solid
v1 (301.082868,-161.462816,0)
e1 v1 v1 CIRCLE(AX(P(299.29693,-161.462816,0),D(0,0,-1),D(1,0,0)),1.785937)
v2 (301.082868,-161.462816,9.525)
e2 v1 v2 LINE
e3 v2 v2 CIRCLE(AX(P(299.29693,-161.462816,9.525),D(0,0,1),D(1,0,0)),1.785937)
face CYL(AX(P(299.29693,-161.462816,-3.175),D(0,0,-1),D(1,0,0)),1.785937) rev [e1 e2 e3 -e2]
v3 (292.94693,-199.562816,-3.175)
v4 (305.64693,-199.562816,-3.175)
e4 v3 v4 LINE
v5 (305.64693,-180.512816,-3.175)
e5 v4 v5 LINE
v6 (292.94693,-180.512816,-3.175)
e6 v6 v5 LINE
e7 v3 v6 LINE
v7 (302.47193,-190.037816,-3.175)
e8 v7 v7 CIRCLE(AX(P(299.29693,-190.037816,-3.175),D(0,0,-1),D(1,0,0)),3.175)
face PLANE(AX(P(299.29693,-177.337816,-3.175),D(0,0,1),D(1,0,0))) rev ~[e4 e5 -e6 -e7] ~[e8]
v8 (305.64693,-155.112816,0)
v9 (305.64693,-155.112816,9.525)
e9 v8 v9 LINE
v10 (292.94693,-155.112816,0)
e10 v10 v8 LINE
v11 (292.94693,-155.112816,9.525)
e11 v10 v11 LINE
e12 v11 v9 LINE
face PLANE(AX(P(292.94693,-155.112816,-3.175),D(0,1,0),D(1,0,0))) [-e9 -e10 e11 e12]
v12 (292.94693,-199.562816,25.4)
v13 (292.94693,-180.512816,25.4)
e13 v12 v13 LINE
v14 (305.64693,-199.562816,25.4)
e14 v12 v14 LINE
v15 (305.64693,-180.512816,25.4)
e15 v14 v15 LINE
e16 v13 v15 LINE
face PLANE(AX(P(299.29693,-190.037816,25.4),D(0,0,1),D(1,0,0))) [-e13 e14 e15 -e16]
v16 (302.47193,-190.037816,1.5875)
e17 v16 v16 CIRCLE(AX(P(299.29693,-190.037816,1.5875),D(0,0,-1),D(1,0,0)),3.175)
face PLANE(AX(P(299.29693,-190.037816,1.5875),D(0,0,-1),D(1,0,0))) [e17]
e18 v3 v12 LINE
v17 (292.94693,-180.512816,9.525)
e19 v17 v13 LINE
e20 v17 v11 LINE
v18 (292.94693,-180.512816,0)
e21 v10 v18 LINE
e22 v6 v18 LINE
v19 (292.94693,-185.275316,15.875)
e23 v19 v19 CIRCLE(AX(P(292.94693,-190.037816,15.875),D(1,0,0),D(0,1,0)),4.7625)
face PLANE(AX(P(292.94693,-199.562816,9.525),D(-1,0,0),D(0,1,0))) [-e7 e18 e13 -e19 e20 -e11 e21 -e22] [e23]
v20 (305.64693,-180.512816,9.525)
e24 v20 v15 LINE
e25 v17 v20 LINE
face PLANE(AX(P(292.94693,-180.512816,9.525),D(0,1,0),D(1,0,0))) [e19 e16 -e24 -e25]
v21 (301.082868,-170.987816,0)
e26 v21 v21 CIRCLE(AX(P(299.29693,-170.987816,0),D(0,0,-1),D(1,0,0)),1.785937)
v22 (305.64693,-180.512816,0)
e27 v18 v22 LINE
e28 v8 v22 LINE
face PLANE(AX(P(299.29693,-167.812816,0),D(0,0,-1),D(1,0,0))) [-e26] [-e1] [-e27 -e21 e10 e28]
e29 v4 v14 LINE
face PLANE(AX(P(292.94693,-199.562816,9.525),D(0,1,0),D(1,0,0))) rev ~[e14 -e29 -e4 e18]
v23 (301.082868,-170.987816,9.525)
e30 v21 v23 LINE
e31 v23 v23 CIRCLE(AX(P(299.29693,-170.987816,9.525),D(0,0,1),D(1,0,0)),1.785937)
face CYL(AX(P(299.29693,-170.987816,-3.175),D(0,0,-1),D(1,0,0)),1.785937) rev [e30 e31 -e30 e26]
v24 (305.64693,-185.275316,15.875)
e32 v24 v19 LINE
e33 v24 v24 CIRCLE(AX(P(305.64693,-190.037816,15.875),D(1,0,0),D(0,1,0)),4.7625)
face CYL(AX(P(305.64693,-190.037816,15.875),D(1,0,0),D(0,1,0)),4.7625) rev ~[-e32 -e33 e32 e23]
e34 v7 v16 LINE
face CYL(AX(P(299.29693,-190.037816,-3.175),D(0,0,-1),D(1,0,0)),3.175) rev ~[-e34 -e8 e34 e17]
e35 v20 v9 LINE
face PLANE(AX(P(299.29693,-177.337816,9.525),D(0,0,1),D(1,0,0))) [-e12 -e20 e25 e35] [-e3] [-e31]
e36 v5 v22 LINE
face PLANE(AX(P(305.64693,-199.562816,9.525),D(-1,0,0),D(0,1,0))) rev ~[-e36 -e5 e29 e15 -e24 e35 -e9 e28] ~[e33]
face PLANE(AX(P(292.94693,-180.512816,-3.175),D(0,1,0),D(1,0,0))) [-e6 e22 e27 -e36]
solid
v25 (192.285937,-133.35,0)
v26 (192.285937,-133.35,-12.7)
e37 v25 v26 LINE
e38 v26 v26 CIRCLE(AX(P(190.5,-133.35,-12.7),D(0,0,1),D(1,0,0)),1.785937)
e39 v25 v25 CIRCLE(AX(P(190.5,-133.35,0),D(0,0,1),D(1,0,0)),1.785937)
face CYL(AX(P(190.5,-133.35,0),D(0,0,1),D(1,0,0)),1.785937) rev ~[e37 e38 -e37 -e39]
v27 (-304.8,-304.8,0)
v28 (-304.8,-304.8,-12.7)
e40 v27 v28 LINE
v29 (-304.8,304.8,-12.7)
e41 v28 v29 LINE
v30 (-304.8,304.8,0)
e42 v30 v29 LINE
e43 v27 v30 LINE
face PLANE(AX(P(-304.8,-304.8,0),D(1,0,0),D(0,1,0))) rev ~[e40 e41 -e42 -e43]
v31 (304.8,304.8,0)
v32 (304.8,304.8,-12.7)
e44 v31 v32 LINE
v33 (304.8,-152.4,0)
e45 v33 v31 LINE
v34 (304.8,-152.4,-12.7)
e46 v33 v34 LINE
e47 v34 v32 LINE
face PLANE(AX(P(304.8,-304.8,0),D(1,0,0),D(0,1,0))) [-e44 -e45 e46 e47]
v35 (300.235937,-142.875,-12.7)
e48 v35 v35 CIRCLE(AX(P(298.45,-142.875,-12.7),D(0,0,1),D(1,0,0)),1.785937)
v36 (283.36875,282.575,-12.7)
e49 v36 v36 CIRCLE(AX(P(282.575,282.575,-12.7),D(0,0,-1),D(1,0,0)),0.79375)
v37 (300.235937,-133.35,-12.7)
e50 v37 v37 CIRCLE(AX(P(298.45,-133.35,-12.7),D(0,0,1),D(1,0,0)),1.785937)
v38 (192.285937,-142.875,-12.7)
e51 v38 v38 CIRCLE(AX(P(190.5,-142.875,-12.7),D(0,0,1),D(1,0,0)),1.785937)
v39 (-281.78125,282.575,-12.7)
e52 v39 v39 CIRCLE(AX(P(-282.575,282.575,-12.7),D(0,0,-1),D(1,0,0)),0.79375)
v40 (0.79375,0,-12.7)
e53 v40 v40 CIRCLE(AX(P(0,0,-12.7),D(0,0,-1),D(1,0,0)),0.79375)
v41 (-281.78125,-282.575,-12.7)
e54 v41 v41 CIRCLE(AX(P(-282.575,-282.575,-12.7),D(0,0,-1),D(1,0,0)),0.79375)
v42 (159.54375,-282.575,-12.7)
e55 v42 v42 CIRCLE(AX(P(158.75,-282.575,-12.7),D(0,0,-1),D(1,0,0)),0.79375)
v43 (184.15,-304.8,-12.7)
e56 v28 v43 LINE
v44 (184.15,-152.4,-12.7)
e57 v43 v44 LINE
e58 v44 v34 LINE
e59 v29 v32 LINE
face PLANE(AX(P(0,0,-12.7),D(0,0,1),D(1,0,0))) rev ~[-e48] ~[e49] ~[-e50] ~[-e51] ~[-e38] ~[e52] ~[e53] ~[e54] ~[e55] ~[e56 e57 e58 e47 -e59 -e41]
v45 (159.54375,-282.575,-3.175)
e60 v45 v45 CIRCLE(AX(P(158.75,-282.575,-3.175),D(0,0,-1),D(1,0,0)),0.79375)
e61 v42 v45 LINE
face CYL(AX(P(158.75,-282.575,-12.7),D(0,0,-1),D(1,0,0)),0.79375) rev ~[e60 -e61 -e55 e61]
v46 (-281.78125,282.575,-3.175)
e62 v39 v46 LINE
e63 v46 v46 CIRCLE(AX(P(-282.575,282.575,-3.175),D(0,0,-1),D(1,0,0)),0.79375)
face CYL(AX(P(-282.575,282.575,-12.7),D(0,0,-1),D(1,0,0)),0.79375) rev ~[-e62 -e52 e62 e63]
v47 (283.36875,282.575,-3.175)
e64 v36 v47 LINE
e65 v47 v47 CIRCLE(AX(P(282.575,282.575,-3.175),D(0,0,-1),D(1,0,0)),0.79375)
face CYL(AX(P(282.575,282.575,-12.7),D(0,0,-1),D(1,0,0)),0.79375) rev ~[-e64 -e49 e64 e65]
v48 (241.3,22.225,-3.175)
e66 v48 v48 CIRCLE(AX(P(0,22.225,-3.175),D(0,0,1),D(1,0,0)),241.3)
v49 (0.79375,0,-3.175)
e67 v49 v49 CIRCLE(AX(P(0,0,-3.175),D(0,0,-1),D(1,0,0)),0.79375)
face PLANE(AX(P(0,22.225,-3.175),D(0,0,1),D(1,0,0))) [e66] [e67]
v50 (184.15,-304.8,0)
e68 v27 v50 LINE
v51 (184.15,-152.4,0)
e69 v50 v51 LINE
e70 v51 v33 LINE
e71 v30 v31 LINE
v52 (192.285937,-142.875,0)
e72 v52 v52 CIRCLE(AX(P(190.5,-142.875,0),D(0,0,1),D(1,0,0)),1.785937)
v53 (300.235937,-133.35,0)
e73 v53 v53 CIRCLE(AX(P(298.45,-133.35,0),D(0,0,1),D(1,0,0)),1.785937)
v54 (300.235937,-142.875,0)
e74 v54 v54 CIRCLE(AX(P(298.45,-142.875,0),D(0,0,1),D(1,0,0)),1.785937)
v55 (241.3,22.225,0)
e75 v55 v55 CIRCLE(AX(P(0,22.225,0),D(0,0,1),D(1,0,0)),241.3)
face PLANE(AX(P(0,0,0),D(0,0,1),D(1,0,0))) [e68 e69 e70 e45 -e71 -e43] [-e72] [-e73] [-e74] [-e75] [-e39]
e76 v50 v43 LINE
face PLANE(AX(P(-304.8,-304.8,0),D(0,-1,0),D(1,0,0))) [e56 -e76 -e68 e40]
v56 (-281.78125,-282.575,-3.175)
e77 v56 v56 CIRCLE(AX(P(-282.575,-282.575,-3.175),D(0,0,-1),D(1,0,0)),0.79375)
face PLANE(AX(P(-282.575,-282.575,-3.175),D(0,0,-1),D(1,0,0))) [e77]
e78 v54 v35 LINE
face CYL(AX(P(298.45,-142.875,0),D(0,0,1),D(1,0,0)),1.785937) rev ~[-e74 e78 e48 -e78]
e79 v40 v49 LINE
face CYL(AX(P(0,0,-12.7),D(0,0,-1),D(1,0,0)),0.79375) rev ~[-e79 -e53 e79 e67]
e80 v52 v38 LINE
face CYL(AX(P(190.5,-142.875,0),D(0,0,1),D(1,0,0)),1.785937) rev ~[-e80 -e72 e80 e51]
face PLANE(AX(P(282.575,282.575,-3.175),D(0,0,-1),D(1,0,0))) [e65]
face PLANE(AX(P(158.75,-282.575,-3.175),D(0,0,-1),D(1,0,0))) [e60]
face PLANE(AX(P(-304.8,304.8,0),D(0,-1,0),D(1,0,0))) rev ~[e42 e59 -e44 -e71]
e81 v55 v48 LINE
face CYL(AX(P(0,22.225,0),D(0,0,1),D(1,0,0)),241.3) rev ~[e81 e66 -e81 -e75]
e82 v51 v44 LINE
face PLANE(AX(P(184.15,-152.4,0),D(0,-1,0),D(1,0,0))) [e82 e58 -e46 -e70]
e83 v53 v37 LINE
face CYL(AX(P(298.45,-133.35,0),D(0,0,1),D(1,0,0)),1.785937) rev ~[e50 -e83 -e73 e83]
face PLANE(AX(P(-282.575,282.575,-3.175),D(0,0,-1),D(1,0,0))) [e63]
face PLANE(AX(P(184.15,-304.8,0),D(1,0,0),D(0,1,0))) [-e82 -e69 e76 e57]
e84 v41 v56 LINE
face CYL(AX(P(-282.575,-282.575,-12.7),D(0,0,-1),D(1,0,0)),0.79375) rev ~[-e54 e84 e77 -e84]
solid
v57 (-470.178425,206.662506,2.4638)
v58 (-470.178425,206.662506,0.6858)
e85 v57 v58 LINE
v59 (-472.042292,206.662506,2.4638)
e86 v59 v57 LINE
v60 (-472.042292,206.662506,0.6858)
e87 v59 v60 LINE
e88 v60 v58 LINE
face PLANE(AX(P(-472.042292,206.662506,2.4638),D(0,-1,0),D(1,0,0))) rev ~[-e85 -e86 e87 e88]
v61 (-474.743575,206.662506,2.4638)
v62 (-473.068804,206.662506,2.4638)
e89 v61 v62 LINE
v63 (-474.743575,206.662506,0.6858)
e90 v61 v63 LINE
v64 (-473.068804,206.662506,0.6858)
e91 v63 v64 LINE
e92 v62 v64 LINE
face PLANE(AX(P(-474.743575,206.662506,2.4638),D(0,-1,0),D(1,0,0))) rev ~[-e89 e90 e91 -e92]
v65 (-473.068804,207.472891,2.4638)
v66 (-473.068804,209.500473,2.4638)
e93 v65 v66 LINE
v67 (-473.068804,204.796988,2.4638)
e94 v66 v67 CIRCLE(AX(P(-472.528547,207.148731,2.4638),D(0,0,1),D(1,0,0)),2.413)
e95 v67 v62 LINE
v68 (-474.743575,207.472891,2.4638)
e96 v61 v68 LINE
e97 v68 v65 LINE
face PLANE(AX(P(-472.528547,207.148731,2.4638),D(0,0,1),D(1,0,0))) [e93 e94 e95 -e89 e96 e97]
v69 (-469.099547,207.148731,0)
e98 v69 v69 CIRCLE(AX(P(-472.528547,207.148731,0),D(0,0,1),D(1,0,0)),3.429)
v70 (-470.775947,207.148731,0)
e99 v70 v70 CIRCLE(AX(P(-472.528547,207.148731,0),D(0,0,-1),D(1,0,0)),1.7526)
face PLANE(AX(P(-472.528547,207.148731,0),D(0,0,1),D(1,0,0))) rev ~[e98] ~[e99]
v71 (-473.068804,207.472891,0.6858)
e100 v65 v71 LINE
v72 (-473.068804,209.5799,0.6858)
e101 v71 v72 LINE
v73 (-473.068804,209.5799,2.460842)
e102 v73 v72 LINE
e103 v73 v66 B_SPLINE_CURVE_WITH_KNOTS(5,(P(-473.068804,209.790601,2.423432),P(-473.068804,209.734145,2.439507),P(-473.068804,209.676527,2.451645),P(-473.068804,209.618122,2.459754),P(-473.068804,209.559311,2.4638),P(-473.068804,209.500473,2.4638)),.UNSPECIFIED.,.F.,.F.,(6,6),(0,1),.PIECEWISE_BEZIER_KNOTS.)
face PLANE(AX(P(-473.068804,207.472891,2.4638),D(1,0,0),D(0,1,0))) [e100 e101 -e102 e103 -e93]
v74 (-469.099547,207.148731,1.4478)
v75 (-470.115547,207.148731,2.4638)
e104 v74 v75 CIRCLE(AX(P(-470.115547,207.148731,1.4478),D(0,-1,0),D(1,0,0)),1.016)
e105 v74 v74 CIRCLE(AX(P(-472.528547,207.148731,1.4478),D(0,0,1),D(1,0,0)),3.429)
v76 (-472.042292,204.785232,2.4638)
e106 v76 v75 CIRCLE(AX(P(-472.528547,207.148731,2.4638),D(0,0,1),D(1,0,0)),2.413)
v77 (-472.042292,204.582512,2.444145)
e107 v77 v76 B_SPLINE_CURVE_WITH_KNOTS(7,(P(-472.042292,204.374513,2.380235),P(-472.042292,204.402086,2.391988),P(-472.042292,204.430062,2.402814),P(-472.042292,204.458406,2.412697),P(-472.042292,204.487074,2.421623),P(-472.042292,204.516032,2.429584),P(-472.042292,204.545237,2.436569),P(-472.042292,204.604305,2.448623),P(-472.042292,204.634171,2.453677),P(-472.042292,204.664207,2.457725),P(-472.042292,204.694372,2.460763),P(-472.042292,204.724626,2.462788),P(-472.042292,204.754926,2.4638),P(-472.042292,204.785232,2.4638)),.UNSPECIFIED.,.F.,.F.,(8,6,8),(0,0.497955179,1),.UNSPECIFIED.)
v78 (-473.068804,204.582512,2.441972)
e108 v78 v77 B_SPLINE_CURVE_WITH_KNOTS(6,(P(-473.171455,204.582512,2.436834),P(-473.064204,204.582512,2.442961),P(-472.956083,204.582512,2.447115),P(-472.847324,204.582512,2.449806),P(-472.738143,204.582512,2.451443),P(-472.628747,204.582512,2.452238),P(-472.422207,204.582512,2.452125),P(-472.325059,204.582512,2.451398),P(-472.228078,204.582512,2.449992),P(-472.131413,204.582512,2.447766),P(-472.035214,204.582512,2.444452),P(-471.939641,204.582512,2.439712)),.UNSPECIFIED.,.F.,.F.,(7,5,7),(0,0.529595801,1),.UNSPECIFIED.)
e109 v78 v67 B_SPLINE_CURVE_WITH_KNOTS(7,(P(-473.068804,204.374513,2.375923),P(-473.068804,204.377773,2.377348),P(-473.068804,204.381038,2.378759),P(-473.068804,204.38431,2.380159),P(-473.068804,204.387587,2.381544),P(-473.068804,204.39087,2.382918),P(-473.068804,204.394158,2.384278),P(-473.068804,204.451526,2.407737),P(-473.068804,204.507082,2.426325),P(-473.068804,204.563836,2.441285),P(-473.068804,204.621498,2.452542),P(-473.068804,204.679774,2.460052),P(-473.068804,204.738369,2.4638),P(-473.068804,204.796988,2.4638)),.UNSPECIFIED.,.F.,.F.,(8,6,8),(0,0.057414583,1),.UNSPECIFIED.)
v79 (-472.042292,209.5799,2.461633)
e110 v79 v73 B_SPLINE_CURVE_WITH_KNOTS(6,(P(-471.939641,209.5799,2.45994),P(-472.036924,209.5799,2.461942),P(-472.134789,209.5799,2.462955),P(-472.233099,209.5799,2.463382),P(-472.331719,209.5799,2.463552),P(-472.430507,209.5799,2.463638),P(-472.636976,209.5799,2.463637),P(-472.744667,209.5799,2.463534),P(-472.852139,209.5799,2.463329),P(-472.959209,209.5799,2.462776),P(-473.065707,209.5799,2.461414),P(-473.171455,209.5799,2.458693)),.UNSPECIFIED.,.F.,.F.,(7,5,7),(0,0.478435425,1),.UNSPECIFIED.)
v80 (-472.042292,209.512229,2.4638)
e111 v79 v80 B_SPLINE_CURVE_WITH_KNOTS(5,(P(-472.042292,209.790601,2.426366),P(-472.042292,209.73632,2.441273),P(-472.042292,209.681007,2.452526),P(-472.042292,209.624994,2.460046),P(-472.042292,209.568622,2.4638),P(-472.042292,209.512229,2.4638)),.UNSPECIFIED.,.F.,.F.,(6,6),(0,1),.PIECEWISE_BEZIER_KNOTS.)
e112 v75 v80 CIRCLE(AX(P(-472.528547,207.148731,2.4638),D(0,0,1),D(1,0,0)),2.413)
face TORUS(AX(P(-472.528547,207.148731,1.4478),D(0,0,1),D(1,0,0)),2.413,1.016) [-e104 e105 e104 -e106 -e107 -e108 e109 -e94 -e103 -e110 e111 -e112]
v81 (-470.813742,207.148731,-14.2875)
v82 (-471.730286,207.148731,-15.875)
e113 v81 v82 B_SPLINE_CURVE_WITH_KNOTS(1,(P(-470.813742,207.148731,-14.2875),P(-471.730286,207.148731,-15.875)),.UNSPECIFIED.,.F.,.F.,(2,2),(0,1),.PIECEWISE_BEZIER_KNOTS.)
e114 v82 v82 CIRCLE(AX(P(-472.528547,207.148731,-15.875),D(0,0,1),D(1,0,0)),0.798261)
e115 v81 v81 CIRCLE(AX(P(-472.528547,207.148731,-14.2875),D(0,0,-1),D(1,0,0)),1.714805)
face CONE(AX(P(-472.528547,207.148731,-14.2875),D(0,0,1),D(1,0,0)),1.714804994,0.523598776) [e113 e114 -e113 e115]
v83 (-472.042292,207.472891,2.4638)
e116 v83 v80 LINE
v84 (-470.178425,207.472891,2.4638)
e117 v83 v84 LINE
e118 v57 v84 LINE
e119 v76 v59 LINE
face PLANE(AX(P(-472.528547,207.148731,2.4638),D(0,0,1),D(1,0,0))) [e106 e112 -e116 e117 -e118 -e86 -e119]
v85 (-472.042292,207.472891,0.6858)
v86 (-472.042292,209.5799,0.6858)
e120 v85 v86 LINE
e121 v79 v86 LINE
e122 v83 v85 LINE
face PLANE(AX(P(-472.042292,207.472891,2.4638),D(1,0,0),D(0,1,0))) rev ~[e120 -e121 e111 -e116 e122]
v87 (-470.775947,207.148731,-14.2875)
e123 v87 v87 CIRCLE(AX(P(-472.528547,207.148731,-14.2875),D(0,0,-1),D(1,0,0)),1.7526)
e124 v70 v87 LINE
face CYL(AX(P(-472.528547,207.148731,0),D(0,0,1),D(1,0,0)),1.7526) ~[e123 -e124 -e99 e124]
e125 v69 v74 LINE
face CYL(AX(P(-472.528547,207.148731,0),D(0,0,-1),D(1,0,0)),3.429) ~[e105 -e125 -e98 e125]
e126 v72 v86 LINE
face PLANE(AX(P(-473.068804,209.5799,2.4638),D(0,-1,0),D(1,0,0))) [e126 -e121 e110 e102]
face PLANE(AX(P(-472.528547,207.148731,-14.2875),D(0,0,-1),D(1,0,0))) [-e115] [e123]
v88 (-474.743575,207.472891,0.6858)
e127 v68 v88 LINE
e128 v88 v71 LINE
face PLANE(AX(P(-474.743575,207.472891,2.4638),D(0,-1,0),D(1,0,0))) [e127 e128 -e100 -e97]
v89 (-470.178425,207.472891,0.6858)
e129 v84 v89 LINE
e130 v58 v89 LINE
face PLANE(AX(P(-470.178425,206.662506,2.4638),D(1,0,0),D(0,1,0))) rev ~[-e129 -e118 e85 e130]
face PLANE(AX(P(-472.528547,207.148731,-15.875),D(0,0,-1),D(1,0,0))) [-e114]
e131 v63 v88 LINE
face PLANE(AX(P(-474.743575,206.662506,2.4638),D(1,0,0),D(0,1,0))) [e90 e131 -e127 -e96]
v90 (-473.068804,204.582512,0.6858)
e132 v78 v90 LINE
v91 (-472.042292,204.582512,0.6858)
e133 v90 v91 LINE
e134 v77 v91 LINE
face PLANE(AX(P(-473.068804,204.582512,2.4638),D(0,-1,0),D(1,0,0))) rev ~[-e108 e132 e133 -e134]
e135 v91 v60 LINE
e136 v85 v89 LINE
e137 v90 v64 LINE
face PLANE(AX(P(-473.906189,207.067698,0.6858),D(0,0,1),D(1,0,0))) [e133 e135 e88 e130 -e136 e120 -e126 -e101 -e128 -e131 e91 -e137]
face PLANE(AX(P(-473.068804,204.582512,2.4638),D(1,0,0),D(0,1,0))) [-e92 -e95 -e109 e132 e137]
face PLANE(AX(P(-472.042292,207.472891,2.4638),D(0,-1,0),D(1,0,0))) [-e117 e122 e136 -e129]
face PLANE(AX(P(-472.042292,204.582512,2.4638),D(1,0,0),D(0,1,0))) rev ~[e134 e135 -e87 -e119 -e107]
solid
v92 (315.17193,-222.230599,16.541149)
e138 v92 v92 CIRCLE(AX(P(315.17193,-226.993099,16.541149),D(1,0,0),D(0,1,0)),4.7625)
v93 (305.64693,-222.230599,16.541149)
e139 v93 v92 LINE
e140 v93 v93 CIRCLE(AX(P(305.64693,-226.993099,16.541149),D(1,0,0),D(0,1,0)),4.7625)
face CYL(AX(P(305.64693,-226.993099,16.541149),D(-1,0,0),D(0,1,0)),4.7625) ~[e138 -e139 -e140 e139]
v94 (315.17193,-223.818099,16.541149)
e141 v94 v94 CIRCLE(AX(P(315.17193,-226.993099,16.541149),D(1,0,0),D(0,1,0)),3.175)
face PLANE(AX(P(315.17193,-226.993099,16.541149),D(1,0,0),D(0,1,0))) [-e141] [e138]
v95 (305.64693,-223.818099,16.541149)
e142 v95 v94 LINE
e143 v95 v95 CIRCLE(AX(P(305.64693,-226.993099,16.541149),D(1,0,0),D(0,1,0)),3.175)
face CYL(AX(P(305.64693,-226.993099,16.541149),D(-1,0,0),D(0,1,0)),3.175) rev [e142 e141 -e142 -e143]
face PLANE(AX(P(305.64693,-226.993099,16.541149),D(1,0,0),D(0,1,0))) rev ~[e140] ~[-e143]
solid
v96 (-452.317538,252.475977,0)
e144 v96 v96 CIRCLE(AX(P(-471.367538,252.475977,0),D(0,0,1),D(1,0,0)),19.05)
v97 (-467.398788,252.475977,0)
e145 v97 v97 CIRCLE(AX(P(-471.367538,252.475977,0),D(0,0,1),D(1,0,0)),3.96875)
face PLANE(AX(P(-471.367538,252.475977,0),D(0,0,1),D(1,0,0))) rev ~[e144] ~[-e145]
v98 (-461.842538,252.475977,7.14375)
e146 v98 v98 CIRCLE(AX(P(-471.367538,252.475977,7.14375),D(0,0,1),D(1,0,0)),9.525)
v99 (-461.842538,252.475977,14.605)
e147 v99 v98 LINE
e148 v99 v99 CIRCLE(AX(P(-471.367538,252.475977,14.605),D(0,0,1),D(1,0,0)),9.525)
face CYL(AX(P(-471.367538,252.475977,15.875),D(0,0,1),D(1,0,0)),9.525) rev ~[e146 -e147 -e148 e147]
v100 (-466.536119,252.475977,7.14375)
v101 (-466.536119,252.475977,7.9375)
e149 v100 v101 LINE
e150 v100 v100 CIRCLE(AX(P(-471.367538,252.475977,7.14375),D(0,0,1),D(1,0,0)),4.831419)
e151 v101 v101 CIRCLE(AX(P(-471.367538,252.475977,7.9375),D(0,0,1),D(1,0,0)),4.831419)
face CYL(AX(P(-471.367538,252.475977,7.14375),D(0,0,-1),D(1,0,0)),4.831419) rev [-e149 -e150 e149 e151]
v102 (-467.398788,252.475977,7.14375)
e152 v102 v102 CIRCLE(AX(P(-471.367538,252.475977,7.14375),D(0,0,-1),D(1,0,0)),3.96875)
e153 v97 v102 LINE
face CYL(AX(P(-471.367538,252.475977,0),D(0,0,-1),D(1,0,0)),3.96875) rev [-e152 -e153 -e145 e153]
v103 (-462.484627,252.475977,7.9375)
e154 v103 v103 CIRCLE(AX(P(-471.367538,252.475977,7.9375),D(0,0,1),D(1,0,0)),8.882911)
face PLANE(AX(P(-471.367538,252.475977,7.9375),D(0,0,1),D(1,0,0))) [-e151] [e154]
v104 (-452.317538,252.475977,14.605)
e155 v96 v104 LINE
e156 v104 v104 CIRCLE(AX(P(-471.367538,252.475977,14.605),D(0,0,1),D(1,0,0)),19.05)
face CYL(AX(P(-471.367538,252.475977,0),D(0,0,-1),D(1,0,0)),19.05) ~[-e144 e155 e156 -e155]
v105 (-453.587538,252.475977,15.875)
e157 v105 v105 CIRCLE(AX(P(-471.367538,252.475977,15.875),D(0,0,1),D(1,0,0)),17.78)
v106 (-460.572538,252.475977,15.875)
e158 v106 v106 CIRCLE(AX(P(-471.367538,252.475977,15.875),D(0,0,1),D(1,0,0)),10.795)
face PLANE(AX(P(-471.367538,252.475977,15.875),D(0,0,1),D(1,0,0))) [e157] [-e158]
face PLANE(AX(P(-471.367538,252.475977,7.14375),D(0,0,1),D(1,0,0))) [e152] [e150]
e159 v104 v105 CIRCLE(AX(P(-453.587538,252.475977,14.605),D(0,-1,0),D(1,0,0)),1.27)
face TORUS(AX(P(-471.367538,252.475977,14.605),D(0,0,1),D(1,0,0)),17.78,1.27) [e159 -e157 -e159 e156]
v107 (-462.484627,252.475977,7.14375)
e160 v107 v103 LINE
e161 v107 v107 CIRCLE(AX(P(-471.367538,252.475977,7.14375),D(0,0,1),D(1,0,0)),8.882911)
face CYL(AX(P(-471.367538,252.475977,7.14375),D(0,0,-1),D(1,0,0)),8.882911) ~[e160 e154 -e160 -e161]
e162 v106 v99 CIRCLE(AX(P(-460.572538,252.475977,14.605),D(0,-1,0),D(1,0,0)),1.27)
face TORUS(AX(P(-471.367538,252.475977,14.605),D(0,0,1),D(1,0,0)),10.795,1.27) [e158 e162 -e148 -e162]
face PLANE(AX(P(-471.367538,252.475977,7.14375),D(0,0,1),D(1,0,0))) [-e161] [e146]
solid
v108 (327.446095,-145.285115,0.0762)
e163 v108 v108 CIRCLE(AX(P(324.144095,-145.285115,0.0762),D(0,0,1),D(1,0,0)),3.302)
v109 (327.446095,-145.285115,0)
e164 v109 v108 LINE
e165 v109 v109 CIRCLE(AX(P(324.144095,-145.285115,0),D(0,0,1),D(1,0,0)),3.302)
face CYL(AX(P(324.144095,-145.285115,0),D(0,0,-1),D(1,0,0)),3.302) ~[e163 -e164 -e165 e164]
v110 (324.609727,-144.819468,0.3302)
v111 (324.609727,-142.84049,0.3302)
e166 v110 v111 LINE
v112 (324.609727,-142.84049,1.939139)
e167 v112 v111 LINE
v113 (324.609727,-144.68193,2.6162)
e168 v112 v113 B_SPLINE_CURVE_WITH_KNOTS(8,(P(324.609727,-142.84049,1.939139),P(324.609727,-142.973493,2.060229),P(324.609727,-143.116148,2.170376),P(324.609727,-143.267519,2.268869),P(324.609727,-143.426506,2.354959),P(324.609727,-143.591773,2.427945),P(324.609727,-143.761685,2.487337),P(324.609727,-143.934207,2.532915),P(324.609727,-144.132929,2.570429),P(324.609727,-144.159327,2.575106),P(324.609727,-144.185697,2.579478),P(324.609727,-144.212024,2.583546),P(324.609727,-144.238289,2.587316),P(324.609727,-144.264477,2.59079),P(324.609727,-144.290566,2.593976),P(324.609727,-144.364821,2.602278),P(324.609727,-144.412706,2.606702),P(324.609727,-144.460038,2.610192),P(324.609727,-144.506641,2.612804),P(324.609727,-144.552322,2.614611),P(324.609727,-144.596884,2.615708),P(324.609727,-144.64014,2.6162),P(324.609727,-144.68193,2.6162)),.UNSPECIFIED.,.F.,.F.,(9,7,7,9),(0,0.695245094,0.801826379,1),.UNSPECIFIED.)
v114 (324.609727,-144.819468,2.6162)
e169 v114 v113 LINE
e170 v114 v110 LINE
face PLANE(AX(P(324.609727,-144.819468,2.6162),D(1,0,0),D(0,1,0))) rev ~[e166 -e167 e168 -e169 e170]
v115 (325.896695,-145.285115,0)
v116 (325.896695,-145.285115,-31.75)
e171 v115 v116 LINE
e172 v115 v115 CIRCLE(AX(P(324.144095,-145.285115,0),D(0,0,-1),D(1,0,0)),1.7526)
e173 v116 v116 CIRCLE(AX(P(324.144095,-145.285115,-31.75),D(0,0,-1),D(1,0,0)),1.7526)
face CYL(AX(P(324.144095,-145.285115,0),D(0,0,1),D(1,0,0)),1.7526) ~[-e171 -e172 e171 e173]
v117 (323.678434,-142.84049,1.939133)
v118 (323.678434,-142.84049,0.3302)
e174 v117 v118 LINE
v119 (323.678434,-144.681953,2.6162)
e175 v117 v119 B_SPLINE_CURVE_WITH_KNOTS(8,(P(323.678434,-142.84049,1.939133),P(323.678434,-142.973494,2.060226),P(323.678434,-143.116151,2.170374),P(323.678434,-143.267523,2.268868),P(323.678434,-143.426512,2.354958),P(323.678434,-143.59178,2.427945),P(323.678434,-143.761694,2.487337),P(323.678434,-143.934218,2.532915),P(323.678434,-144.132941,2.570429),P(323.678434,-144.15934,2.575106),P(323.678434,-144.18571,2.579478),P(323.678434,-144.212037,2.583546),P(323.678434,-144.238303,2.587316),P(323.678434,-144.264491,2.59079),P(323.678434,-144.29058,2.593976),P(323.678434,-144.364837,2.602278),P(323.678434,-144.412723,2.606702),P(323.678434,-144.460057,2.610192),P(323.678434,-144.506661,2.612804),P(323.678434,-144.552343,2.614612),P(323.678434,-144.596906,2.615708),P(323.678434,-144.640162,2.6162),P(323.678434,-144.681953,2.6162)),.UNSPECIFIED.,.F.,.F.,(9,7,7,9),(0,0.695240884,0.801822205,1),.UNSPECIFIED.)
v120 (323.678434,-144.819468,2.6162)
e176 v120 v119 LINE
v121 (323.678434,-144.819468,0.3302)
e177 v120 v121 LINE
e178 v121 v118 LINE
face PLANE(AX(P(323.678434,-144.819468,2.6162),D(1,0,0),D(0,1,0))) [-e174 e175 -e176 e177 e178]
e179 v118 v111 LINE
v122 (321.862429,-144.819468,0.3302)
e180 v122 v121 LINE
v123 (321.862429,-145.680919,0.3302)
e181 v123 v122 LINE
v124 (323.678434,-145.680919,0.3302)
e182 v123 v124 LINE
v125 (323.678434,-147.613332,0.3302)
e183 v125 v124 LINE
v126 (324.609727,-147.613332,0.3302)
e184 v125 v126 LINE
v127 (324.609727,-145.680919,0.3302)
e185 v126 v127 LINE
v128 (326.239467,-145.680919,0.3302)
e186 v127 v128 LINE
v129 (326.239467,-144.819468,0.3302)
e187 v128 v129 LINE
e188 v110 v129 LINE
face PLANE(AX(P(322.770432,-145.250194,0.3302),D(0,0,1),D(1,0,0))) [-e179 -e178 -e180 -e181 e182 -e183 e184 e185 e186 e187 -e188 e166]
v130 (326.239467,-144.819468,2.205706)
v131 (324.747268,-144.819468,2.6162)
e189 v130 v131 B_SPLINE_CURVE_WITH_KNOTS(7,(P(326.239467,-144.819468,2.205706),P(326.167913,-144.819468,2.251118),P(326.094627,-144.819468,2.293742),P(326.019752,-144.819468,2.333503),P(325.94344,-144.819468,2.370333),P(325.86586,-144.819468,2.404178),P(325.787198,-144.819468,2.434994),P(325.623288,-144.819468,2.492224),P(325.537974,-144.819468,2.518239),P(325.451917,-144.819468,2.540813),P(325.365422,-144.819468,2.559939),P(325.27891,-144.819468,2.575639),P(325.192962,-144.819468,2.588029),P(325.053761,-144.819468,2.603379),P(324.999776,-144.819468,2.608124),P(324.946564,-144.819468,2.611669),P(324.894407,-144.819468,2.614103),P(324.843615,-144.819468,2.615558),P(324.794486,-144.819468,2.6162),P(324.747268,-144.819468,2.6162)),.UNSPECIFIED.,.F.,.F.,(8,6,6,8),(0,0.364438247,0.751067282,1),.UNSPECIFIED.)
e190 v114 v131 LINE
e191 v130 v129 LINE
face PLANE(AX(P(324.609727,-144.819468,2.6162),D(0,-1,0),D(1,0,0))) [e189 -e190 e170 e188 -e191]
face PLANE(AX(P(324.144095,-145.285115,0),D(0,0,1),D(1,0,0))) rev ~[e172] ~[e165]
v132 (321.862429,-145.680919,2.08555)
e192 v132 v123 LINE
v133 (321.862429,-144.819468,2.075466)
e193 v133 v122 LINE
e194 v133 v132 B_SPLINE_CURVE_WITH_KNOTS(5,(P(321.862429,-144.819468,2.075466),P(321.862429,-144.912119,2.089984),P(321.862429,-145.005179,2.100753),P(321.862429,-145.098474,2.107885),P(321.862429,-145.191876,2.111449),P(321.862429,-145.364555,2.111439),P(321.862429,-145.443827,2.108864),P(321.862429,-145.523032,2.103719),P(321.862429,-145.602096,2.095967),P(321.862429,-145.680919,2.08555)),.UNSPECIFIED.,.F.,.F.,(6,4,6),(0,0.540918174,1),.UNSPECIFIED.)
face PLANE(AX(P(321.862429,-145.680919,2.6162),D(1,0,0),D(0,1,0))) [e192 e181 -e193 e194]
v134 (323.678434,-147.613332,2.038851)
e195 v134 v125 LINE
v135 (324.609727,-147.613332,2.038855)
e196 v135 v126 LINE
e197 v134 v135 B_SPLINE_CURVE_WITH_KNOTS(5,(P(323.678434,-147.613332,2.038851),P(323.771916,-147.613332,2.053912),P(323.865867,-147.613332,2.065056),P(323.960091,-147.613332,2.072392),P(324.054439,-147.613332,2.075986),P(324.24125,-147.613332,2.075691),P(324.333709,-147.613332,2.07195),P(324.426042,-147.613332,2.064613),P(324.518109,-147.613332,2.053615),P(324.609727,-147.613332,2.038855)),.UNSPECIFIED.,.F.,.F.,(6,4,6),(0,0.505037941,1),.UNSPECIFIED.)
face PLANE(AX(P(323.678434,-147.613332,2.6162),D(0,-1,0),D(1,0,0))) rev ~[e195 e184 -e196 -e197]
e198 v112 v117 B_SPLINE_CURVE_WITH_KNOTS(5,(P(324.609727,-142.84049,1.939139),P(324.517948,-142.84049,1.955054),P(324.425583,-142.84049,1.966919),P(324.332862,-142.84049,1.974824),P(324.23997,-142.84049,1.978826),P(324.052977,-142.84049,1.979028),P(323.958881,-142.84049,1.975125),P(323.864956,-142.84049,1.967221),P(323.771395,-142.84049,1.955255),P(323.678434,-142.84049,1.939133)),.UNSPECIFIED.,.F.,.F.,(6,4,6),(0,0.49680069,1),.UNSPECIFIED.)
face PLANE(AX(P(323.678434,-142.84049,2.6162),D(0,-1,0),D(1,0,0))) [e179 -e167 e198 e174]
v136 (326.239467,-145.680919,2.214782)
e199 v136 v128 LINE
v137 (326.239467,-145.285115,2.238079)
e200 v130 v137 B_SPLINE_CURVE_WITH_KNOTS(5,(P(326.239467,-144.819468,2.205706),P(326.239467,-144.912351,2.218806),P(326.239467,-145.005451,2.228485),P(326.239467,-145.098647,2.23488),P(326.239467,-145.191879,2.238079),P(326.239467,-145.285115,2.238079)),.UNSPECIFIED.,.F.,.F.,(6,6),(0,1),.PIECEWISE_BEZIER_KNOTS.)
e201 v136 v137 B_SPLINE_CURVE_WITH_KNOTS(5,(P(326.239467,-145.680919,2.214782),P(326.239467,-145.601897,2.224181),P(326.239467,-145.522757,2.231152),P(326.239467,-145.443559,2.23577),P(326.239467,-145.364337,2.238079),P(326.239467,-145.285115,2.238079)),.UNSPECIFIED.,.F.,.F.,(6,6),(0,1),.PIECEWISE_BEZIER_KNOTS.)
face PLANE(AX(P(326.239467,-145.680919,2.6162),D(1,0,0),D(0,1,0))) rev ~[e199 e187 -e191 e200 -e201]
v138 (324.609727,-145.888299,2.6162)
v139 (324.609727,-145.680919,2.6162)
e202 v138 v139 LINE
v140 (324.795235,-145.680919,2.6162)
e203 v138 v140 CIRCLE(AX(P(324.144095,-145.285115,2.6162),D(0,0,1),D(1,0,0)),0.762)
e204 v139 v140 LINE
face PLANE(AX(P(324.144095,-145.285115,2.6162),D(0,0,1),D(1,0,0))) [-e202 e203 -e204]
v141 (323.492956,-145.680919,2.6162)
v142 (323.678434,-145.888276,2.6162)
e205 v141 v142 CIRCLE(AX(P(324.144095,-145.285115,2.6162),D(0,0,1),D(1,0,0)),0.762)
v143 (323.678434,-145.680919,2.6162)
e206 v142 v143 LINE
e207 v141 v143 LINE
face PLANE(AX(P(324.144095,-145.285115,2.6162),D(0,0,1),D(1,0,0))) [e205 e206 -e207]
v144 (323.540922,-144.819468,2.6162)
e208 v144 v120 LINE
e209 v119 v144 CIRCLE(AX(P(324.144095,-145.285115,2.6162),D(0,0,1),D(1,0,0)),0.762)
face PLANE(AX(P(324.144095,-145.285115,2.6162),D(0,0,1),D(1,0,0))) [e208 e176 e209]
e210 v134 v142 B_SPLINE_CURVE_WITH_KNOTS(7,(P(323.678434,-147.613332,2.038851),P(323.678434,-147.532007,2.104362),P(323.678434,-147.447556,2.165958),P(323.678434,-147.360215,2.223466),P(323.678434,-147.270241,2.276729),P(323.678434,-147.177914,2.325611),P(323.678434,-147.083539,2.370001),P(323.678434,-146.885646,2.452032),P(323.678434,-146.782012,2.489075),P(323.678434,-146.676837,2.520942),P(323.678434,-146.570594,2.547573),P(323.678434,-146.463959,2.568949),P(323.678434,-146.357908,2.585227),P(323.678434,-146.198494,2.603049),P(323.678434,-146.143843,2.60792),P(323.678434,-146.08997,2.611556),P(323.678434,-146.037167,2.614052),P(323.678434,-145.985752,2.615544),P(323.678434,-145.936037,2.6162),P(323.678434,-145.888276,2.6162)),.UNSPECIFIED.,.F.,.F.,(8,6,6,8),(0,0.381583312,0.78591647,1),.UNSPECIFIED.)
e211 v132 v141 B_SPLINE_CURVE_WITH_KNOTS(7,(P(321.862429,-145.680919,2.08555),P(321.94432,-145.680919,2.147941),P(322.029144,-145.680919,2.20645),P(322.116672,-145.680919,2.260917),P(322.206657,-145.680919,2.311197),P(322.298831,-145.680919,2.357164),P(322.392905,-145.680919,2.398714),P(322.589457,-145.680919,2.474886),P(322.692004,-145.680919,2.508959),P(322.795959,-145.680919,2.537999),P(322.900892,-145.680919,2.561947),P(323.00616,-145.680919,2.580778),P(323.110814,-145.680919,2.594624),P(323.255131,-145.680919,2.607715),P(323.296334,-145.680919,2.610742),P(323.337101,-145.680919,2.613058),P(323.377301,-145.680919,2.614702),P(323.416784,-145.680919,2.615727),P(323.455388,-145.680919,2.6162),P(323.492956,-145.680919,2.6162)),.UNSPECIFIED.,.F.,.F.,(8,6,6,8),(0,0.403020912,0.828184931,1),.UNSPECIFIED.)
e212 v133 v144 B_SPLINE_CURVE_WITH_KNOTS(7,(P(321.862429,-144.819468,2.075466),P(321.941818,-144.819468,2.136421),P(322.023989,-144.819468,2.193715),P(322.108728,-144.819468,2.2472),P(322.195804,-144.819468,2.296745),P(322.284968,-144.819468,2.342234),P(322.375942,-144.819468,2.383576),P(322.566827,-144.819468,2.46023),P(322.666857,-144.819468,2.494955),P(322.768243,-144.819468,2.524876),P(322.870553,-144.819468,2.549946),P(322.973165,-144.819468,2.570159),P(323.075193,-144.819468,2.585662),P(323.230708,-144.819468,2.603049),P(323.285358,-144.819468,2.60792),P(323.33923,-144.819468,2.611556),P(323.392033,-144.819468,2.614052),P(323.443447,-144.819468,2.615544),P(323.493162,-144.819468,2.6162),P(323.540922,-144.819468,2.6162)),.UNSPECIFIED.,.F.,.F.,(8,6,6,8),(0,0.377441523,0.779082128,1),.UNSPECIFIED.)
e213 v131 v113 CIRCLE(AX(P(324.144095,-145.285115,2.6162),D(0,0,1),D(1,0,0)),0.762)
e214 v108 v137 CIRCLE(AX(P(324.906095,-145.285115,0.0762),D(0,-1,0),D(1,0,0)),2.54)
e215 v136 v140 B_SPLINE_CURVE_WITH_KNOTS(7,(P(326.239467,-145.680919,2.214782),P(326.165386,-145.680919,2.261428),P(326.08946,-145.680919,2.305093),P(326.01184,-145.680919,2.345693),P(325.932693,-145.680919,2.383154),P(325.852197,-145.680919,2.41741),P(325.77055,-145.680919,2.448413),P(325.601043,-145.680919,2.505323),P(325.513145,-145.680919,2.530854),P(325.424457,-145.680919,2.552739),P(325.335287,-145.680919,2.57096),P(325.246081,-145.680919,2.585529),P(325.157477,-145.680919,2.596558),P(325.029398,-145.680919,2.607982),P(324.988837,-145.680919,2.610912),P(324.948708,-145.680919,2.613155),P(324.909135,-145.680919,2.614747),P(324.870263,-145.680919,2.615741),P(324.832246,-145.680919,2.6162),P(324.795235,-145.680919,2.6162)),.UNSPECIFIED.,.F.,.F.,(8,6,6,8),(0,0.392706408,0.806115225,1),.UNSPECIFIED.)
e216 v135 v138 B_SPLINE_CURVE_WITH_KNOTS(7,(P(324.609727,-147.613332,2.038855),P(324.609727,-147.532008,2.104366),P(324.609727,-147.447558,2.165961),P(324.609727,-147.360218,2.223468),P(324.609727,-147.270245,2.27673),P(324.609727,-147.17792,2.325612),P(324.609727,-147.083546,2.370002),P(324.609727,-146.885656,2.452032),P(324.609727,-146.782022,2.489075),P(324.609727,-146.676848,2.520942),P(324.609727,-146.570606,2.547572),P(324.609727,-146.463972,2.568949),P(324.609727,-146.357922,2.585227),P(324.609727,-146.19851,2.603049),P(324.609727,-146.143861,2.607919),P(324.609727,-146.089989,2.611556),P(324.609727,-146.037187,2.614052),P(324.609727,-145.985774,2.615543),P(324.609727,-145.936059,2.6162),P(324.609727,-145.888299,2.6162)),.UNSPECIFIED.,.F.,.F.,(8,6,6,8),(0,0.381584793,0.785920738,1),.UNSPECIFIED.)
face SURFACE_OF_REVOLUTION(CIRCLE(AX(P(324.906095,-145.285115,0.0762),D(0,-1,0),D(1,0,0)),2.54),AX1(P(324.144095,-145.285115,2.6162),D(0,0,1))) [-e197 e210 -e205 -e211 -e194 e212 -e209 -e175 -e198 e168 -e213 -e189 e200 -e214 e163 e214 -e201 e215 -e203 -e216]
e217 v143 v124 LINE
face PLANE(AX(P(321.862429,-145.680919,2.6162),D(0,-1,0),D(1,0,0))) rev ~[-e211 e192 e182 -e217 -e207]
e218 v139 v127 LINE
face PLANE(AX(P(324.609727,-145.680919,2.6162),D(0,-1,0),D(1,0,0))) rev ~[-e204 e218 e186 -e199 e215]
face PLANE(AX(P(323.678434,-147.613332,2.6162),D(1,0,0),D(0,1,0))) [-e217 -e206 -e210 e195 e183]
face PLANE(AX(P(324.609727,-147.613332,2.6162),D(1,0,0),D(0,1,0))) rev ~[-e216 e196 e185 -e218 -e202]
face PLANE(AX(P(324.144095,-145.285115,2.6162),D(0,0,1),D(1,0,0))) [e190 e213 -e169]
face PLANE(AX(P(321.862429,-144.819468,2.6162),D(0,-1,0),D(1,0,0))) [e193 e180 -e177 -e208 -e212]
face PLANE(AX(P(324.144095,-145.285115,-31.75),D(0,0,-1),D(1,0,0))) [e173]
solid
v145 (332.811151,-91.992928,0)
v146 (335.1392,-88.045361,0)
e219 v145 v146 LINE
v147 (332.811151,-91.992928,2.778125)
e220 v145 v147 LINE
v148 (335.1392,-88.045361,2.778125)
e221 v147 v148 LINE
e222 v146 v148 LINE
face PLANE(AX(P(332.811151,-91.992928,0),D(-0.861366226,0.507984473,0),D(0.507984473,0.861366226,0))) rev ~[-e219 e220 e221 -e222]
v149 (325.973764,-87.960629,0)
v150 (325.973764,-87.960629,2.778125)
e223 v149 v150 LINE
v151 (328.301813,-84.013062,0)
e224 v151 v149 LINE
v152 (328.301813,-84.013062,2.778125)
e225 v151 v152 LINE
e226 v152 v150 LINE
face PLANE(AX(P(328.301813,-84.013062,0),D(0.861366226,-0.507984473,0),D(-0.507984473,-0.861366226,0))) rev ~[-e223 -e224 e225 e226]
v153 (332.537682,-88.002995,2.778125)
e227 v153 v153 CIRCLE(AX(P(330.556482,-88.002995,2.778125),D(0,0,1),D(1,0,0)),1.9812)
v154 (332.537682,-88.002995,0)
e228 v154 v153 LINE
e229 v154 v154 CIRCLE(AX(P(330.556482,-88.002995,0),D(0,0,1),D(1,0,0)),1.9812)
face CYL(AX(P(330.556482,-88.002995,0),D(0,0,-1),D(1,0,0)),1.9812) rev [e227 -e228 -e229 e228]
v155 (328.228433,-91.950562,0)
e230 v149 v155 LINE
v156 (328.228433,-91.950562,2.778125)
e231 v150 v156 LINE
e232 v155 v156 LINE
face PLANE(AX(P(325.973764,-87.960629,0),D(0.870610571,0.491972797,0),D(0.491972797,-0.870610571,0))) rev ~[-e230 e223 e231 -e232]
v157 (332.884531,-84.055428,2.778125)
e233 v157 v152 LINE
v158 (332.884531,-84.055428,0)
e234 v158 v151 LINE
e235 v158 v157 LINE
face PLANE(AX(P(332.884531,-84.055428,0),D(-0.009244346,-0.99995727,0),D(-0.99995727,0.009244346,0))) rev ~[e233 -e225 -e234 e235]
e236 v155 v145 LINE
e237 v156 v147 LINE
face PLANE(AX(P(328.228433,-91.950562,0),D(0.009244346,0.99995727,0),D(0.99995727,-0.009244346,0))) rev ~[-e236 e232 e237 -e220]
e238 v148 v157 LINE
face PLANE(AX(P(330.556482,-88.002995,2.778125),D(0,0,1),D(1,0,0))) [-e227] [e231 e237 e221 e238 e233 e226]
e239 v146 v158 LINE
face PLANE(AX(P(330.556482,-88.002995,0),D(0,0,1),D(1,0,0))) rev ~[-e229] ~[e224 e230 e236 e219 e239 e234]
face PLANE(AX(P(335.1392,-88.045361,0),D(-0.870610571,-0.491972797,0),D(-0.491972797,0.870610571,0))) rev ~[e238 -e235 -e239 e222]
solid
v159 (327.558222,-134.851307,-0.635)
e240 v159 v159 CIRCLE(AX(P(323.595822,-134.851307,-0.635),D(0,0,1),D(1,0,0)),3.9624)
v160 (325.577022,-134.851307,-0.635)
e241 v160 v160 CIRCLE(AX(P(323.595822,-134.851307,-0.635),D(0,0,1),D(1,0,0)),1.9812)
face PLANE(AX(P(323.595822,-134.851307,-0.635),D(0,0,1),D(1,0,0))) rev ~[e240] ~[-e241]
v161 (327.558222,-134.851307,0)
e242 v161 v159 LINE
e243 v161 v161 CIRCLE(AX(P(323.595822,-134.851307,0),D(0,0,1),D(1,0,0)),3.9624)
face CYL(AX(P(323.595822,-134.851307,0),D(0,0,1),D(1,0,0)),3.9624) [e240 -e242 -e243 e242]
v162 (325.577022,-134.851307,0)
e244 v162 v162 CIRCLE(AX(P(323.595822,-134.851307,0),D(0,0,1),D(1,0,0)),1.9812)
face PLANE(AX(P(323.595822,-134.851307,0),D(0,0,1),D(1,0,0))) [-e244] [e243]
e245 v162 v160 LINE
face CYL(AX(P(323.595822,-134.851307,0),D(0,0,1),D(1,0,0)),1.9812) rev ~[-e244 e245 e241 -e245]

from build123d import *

# Parameters (mm, degrees)
F0_W      = 609.6
F0_H      = 609.6
F1_DEPTH  = 12.7
F2_R      = 19.05
F2_R_2    = 3.96875
F3_DEPTH  = 15.875
F4_R      = 9.525
F5_DEPTH  = 8.73125
F6_R      = 1.27
F7_R      = 8.8829111055
F7_R_2    = 4.8314193562
F8_DEPTH  = 0.79375
F9_R      = 0.79375
F10_DEPTH = 9.525
F11_R     = 3.429
F12_DEPTH = 2.4638
F13_W     = 1.6747713089
F13_H     = 0.8103847504
F13_W_2   = 1.0265111923
F13_H_2   = 2.1070092916
F13_W_3   = 1.8638670444
F13_H_3   = 2.0799934864
F14_DEPTH = 1.778
F16_R     = 1.7526
F17_DEPTH = 14.2875
F18_R     = 1.7148049935
F19_DEPTH = 1.5875
F19_TAPER = 30
F20_R     = 241.3
F21_DEPTH = 3.175
F22_W     = 120.65
F22_H     = 152.4
F23_DEPTH = 25.4
F24_R     = 1.7859375
F25_DEPTH = 25.4
F26_W     = 12.7
F26_H     = 44.45
F26_R     = 1.7859375
F27_DEPTH = 12.7
F28_W     = 12.7
F28_H     = 19.05
F29_DEPTH = 15.875
F30_R     = 4.7625
F31_DEPTH = 25.4
F32_R     = 4.7625
F32_R_2   = 3.175
F33_DEPTH = 9.525
F34_R     = 3.302
F35_DEPTH = 2.6162
F36_W     = 1.8160045147
F36_H     = 0.8614510298
F36_W_2   = 0.9312927723
F36_H_2   = 1.9789785147
F36_W_3   = 1.6297399998
F36_H_3   = 1.9324123859
F37_DEPTH = 2.286
F39_R     = 1.7526
F40_DEPTH = 31.75
F41_R     = 3.9624
F41_R_2   = 1.9812
F42_DEPTH = 0.635
F43_R     = 1.9812
F44_DEPTH = 2.778125
F45_R     = 3.175
F46_DEPTH = 4.7625
F47_W     = 12.7
F47_H     = 25.4
F48_DEPTH = 3.175


# Not quite as in the source:
# - a fillet or chamfer that OpenCascade refuses, or shapes differently, is made with other operations: its cross-section is extruded or revolved along the edge and cut away or added


with BuildPart() as f1:
    # F0 (on Top) → F1 (new body)
    with BuildSketch(Plane.XY):
        Rectangle(F0_W, F0_H)
    extrude(amount=-F1_DEPTH)

    # F9 (on face) → F10 (cut)
    with BuildSketch(Plane(origin=(0, 0, -12.7), x_dir=(1, 0, 0), z_dir=(0, 0, -1))):
        with Locations((-282.575, 282.575)):
            Circle(F9_R)
        with Locations((-282.575, -282.575)):
            Circle(F9_R)
        with Locations((282.575, -282.575)):
            Circle(F9_R)
        Circle(F9_R)
        with Locations((158.75, 282.575)):
            Circle(F9_R)
        with Locations((244.475, 282.575)):
            Circle(F9_R)
    extrude(amount=-F10_DEPTH, mode=Mode.SUBTRACT)

    # F20 (on face) → F21 (cut)
    with BuildSketch(Plane.XY):
        with Locations((0, 22.225)):
            Circle(F20_R)
    extrude(amount=-F21_DEPTH, mode=Mode.SUBTRACT)

    # F22 (on face) → F23 (cut)
    with BuildSketch(Plane.XY):
        with Locations((244.475, -228.6)):
            Rectangle(F22_W, F22_H)
    extrude(amount=-F23_DEPTH, mode=Mode.SUBTRACT)

    # F24 (on face) → F25 (cut)
    with BuildSketch(Plane.XY):
        with Locations((190.5, -133.35)):
            Circle(F24_R)
        with Locations((190.5, -142.875)):
            Circle(F24_R)
        with Locations((298.45, -133.35)):
            Circle(F24_R)
        with Locations((298.45, -142.875)):
            Circle(F24_R)
    extrude(amount=-F25_DEPTH, mode=Mode.SUBTRACT)


with BuildPart() as f3:
    # F2 (on face) → F3 (new body)
    with BuildSketch(Plane.XY):
        with Locations((-471.3675379753, 252.475976944)):
            Circle(F2_R)
        with Locations((-471.3675379753, 252.475976944)):
            Circle(F2_R_2, mode=Mode.SUBTRACT)
    extrude(amount=F3_DEPTH)

    # F4 (on face) → F5 (cut)
    with BuildSketch(Plane.XY.offset(15.875)):
        with Locations((-471.3675379753, 252.475976944)):
            Circle(F4_R)
    extrude(amount=-F5_DEPTH, mode=Mode.SUBTRACT)

    # F6
    f6_edges = [f3.edges().sort_by_distance(p)[0] for p in [
        (-490.417538, 252.475977, 15.875),
        (-480.892538, 252.475977, 15.875),
    ]]
    fillet(f6_edges, radius=F6_R)

    # F7 (on face) → F8 (join)
    with BuildSketch(Plane.XY.offset(7.14375)):
        with Locations((-471.3675379753, 252.475976944)):
            Circle(F7_R)
        with Locations((-471.3675379753, 252.475976944)):
            Circle(F7_R_2, mode=Mode.SUBTRACT)
    extrude(amount=F8_DEPTH)


with BuildPart() as f12:
    # F11 (on face) → F12 (new body)
    with BuildSketch(Plane.XY):
        with Locations((-472.5285470486, 207.1487307549)):
            Circle(F11_R)
    extrude(amount=F12_DEPTH)

    # F13 (on face) → F14 (cut)
    with BuildSketch(Plane.XY.offset(2.4638)):
        with Locations((-473.9061892033, 207.0676982403)):
            Rectangle(F13_W, F13_H)
        with Locations((-472.5555479527, 208.5263952613)):
            Rectangle(F13_W_2, F13_H_2)
        with Locations((-472.5555479527, 207.0676982403)):
            Rectangle(F13_W_2, F13_H)
        with Locations((-471.1103588343, 207.0676982403)):
            Rectangle(F13_W_3, F13_H)
        with Locations((-472.5555479527, 205.6225091219)):
            Rectangle(F13_W_2, F13_H_3)
    extrude(amount=-F14_DEPTH, mode=Mode.SUBTRACT)

    # F15: fillet of radius 1.016 on 1 edges, made by hand

    # F15_s1 → F15_t2 (revolve, cut)
    with BuildSketch(Plane.XZ.offset(-207.1487307549)):
        with BuildLine():
            ThreePointArc((-469.0995470486, 1.4478), (-469.3971265589, 2.1662204897), (-470.1155470486, 2.4638))
            Line((-470.1155470486, 2.4638), (-469.0995470486, 2.4638))
            Line((-469.0995470486, 2.4638), (-469.0995470486, 1.4478))
        make_face()
    revolve(axis=Axis((-472.5285470486, 207.1487307549, 2.4638), (0, 0, 1)), mode=Mode.SUBTRACT)

    # F16 (on face) → F17 (join)
    with BuildSketch(Plane(origin=(0, 0, 0), x_dir=(1, 0, 0), z_dir=(0, 0, -1))):
        with Locations((-472.5285470486, -207.1487307549)):
            Circle(F16_R)
    extrude(amount=F17_DEPTH)

    # F18 (on face) → F19 (join)
    with BuildSketch(Plane(origin=(0, 0, -14.2875), x_dir=(1, 0, 0), z_dir=(0, 0, -1))):
        with Locations((-472.5285470486, -207.1487307549)):
            Circle(F18_R)
    extrude(amount=F19_DEPTH, taper=F19_TAPER)


with BuildPart() as f27:
    # F26 (on face) → F27 (new body)
    with BuildSketch(Plane.XY.offset(-3.175)):
        with Locations((299.2969304323, -177.3378157832)):
            Rectangle(F26_W, F26_H)
        with Locations((299.2969304323, -170.9878157832)):
            Circle(F26_R, mode=Mode.SUBTRACT)
        with Locations((299.2969304323, -161.4628157832)):
            Circle(F26_R, mode=Mode.SUBTRACT)
    extrude(amount=F27_DEPTH)

    # F28 (on face) → F29 (join)
    with BuildSketch(Plane.XY.offset(9.525)):
        with Locations((299.2969304323, -190.0378157832)):
            Rectangle(F28_W, F28_H)
    extrude(amount=F29_DEPTH)

    # F30 (on face) → F31 (cut)
    with BuildSketch(Plane.YZ.offset(305.6469304323)):
        with Locations((-190.0378157832, 15.875)):
            Circle(F30_R)
    extrude(amount=-F31_DEPTH, mode=Mode.SUBTRACT)

    # F45 (on face) → F46 (cut)
    with BuildSketch(Plane(origin=(0, 0, -3.175), x_dir=(1, 0, 0), z_dir=(0, 0, -1))):
        with Locations((299.2969304323, 190.0378157832)):
            Circle(F45_R)
    extrude(amount=-F46_DEPTH, mode=Mode.SUBTRACT)

    # F47 (on face) → F48 (cut)
    with BuildSketch(Plane(origin=(0, 0, -3.175), x_dir=(1, 0, 0), z_dir=(0, 0, -1))):
        with Locations((299.2969304323, 167.8128157832)):
            Rectangle(F47_W, F47_H)
    extrude(amount=-F48_DEPTH, mode=Mode.SUBTRACT)


with BuildPart() as f33:
    # F32 (on face) → F33 (new body)
    with BuildSketch(Plane.YZ.offset(305.6469304323)):
        with Locations((-226.993098855, 16.5411494672)):
            Circle(F32_R)
        with Locations((-226.993098855, 16.5411494672)):
            Circle(F32_R_2, mode=Mode.SUBTRACT)
    extrude(amount=F33_DEPTH)


with BuildPart() as f35:
    # F34 (on face) → F35 (new body)
    with BuildSketch(Plane.XY):
        with Locations((324.1440951824, -145.285114646)):
            Circle(F34_R)
    extrude(amount=F35_DEPTH)

    # F36 (on face) → F37 (cut)
    with BuildSketch(Plane.XY.offset(2.6162)):
        with Locations((322.7704316378, -145.2501937747)):
            Rectangle(F36_W, F36_H)
        with Locations((324.1440802813, -143.8299790025)):
            Rectangle(F36_W_2, F36_H_2)
        with Locations((324.1440802813, -145.2501937747)):
            Rectangle(F36_W_2, F36_H)
        with Locations((325.4245966673, -145.2501937747)):
            Rectangle(F36_W_3, F36_H)
        with Locations((324.1440802813, -146.6471254826)):
            Rectangle(F36_W_2, F36_H_3)
    extrude(amount=-F37_DEPTH, mode=Mode.SUBTRACT)

    # F38: fillet of radius 2.54 on 1 edges, made by hand

    # F38_s1 → F38_t2 (revolve, cut)
    with BuildSketch(Plane.XZ.offset(145.285114646)):
        with BuildLine():
            ThreePointArc((327.4460951824, 0.0762), (326.7021464066, 1.8722512242), (324.9060951824, 2.6162))
            Line((324.9060951824, 2.6162), (327.4460951824, 2.6162))
            Line((327.4460951824, 2.6162), (327.4460951824, 0.0762))
        make_face()
    revolve(axis=Axis((324.1440951824, -145.285114646, 2.6162), (0, 0, 1)), mode=Mode.SUBTRACT)

    # F39 (on face) → F40 (join)
    with BuildSketch(Plane(origin=(0, 0, 0), x_dir=(1, 0, 0), z_dir=(0, 0, -1))):
        with Locations((324.1440951824, 145.285114646)):
            Circle(F39_R)
    extrude(amount=F40_DEPTH)


with BuildPart() as f42:
    # F41 (on face) → F42 (new body)
    with BuildSketch(Plane.XY):
        with Locations((323.5958218575, -134.8513066769)):
            Circle(F41_R)
        with Locations((323.5958218575, -134.8513066769)):
            Circle(F41_R_2, mode=Mode.SUBTRACT)
    extrude(amount=-F42_DEPTH)


with BuildPart() as f44:
    # F43 (on face) → F44 (new body)
    with BuildSketch(Plane.XY):
        Polygon((332.8111508927, -91.9929276752), (335.1391998381, -88.0453606938), (332.8845310219, -84.0554276752), (328.3018132602, -84.0130616379), (325.9737643148, -87.9606286192), (328.228433131, -91.9505616379), align=None)
        with Locations((330.5564820765, -88.0029946565)):
            Circle(F43_R, mode=Mode.SUBTRACT)
    extrude(amount=F44_DEPTH)


solid = Compound([f1.part, f3.part, f12.part, f27.part, f33.part, f35.part, f42.part, f44.part])
